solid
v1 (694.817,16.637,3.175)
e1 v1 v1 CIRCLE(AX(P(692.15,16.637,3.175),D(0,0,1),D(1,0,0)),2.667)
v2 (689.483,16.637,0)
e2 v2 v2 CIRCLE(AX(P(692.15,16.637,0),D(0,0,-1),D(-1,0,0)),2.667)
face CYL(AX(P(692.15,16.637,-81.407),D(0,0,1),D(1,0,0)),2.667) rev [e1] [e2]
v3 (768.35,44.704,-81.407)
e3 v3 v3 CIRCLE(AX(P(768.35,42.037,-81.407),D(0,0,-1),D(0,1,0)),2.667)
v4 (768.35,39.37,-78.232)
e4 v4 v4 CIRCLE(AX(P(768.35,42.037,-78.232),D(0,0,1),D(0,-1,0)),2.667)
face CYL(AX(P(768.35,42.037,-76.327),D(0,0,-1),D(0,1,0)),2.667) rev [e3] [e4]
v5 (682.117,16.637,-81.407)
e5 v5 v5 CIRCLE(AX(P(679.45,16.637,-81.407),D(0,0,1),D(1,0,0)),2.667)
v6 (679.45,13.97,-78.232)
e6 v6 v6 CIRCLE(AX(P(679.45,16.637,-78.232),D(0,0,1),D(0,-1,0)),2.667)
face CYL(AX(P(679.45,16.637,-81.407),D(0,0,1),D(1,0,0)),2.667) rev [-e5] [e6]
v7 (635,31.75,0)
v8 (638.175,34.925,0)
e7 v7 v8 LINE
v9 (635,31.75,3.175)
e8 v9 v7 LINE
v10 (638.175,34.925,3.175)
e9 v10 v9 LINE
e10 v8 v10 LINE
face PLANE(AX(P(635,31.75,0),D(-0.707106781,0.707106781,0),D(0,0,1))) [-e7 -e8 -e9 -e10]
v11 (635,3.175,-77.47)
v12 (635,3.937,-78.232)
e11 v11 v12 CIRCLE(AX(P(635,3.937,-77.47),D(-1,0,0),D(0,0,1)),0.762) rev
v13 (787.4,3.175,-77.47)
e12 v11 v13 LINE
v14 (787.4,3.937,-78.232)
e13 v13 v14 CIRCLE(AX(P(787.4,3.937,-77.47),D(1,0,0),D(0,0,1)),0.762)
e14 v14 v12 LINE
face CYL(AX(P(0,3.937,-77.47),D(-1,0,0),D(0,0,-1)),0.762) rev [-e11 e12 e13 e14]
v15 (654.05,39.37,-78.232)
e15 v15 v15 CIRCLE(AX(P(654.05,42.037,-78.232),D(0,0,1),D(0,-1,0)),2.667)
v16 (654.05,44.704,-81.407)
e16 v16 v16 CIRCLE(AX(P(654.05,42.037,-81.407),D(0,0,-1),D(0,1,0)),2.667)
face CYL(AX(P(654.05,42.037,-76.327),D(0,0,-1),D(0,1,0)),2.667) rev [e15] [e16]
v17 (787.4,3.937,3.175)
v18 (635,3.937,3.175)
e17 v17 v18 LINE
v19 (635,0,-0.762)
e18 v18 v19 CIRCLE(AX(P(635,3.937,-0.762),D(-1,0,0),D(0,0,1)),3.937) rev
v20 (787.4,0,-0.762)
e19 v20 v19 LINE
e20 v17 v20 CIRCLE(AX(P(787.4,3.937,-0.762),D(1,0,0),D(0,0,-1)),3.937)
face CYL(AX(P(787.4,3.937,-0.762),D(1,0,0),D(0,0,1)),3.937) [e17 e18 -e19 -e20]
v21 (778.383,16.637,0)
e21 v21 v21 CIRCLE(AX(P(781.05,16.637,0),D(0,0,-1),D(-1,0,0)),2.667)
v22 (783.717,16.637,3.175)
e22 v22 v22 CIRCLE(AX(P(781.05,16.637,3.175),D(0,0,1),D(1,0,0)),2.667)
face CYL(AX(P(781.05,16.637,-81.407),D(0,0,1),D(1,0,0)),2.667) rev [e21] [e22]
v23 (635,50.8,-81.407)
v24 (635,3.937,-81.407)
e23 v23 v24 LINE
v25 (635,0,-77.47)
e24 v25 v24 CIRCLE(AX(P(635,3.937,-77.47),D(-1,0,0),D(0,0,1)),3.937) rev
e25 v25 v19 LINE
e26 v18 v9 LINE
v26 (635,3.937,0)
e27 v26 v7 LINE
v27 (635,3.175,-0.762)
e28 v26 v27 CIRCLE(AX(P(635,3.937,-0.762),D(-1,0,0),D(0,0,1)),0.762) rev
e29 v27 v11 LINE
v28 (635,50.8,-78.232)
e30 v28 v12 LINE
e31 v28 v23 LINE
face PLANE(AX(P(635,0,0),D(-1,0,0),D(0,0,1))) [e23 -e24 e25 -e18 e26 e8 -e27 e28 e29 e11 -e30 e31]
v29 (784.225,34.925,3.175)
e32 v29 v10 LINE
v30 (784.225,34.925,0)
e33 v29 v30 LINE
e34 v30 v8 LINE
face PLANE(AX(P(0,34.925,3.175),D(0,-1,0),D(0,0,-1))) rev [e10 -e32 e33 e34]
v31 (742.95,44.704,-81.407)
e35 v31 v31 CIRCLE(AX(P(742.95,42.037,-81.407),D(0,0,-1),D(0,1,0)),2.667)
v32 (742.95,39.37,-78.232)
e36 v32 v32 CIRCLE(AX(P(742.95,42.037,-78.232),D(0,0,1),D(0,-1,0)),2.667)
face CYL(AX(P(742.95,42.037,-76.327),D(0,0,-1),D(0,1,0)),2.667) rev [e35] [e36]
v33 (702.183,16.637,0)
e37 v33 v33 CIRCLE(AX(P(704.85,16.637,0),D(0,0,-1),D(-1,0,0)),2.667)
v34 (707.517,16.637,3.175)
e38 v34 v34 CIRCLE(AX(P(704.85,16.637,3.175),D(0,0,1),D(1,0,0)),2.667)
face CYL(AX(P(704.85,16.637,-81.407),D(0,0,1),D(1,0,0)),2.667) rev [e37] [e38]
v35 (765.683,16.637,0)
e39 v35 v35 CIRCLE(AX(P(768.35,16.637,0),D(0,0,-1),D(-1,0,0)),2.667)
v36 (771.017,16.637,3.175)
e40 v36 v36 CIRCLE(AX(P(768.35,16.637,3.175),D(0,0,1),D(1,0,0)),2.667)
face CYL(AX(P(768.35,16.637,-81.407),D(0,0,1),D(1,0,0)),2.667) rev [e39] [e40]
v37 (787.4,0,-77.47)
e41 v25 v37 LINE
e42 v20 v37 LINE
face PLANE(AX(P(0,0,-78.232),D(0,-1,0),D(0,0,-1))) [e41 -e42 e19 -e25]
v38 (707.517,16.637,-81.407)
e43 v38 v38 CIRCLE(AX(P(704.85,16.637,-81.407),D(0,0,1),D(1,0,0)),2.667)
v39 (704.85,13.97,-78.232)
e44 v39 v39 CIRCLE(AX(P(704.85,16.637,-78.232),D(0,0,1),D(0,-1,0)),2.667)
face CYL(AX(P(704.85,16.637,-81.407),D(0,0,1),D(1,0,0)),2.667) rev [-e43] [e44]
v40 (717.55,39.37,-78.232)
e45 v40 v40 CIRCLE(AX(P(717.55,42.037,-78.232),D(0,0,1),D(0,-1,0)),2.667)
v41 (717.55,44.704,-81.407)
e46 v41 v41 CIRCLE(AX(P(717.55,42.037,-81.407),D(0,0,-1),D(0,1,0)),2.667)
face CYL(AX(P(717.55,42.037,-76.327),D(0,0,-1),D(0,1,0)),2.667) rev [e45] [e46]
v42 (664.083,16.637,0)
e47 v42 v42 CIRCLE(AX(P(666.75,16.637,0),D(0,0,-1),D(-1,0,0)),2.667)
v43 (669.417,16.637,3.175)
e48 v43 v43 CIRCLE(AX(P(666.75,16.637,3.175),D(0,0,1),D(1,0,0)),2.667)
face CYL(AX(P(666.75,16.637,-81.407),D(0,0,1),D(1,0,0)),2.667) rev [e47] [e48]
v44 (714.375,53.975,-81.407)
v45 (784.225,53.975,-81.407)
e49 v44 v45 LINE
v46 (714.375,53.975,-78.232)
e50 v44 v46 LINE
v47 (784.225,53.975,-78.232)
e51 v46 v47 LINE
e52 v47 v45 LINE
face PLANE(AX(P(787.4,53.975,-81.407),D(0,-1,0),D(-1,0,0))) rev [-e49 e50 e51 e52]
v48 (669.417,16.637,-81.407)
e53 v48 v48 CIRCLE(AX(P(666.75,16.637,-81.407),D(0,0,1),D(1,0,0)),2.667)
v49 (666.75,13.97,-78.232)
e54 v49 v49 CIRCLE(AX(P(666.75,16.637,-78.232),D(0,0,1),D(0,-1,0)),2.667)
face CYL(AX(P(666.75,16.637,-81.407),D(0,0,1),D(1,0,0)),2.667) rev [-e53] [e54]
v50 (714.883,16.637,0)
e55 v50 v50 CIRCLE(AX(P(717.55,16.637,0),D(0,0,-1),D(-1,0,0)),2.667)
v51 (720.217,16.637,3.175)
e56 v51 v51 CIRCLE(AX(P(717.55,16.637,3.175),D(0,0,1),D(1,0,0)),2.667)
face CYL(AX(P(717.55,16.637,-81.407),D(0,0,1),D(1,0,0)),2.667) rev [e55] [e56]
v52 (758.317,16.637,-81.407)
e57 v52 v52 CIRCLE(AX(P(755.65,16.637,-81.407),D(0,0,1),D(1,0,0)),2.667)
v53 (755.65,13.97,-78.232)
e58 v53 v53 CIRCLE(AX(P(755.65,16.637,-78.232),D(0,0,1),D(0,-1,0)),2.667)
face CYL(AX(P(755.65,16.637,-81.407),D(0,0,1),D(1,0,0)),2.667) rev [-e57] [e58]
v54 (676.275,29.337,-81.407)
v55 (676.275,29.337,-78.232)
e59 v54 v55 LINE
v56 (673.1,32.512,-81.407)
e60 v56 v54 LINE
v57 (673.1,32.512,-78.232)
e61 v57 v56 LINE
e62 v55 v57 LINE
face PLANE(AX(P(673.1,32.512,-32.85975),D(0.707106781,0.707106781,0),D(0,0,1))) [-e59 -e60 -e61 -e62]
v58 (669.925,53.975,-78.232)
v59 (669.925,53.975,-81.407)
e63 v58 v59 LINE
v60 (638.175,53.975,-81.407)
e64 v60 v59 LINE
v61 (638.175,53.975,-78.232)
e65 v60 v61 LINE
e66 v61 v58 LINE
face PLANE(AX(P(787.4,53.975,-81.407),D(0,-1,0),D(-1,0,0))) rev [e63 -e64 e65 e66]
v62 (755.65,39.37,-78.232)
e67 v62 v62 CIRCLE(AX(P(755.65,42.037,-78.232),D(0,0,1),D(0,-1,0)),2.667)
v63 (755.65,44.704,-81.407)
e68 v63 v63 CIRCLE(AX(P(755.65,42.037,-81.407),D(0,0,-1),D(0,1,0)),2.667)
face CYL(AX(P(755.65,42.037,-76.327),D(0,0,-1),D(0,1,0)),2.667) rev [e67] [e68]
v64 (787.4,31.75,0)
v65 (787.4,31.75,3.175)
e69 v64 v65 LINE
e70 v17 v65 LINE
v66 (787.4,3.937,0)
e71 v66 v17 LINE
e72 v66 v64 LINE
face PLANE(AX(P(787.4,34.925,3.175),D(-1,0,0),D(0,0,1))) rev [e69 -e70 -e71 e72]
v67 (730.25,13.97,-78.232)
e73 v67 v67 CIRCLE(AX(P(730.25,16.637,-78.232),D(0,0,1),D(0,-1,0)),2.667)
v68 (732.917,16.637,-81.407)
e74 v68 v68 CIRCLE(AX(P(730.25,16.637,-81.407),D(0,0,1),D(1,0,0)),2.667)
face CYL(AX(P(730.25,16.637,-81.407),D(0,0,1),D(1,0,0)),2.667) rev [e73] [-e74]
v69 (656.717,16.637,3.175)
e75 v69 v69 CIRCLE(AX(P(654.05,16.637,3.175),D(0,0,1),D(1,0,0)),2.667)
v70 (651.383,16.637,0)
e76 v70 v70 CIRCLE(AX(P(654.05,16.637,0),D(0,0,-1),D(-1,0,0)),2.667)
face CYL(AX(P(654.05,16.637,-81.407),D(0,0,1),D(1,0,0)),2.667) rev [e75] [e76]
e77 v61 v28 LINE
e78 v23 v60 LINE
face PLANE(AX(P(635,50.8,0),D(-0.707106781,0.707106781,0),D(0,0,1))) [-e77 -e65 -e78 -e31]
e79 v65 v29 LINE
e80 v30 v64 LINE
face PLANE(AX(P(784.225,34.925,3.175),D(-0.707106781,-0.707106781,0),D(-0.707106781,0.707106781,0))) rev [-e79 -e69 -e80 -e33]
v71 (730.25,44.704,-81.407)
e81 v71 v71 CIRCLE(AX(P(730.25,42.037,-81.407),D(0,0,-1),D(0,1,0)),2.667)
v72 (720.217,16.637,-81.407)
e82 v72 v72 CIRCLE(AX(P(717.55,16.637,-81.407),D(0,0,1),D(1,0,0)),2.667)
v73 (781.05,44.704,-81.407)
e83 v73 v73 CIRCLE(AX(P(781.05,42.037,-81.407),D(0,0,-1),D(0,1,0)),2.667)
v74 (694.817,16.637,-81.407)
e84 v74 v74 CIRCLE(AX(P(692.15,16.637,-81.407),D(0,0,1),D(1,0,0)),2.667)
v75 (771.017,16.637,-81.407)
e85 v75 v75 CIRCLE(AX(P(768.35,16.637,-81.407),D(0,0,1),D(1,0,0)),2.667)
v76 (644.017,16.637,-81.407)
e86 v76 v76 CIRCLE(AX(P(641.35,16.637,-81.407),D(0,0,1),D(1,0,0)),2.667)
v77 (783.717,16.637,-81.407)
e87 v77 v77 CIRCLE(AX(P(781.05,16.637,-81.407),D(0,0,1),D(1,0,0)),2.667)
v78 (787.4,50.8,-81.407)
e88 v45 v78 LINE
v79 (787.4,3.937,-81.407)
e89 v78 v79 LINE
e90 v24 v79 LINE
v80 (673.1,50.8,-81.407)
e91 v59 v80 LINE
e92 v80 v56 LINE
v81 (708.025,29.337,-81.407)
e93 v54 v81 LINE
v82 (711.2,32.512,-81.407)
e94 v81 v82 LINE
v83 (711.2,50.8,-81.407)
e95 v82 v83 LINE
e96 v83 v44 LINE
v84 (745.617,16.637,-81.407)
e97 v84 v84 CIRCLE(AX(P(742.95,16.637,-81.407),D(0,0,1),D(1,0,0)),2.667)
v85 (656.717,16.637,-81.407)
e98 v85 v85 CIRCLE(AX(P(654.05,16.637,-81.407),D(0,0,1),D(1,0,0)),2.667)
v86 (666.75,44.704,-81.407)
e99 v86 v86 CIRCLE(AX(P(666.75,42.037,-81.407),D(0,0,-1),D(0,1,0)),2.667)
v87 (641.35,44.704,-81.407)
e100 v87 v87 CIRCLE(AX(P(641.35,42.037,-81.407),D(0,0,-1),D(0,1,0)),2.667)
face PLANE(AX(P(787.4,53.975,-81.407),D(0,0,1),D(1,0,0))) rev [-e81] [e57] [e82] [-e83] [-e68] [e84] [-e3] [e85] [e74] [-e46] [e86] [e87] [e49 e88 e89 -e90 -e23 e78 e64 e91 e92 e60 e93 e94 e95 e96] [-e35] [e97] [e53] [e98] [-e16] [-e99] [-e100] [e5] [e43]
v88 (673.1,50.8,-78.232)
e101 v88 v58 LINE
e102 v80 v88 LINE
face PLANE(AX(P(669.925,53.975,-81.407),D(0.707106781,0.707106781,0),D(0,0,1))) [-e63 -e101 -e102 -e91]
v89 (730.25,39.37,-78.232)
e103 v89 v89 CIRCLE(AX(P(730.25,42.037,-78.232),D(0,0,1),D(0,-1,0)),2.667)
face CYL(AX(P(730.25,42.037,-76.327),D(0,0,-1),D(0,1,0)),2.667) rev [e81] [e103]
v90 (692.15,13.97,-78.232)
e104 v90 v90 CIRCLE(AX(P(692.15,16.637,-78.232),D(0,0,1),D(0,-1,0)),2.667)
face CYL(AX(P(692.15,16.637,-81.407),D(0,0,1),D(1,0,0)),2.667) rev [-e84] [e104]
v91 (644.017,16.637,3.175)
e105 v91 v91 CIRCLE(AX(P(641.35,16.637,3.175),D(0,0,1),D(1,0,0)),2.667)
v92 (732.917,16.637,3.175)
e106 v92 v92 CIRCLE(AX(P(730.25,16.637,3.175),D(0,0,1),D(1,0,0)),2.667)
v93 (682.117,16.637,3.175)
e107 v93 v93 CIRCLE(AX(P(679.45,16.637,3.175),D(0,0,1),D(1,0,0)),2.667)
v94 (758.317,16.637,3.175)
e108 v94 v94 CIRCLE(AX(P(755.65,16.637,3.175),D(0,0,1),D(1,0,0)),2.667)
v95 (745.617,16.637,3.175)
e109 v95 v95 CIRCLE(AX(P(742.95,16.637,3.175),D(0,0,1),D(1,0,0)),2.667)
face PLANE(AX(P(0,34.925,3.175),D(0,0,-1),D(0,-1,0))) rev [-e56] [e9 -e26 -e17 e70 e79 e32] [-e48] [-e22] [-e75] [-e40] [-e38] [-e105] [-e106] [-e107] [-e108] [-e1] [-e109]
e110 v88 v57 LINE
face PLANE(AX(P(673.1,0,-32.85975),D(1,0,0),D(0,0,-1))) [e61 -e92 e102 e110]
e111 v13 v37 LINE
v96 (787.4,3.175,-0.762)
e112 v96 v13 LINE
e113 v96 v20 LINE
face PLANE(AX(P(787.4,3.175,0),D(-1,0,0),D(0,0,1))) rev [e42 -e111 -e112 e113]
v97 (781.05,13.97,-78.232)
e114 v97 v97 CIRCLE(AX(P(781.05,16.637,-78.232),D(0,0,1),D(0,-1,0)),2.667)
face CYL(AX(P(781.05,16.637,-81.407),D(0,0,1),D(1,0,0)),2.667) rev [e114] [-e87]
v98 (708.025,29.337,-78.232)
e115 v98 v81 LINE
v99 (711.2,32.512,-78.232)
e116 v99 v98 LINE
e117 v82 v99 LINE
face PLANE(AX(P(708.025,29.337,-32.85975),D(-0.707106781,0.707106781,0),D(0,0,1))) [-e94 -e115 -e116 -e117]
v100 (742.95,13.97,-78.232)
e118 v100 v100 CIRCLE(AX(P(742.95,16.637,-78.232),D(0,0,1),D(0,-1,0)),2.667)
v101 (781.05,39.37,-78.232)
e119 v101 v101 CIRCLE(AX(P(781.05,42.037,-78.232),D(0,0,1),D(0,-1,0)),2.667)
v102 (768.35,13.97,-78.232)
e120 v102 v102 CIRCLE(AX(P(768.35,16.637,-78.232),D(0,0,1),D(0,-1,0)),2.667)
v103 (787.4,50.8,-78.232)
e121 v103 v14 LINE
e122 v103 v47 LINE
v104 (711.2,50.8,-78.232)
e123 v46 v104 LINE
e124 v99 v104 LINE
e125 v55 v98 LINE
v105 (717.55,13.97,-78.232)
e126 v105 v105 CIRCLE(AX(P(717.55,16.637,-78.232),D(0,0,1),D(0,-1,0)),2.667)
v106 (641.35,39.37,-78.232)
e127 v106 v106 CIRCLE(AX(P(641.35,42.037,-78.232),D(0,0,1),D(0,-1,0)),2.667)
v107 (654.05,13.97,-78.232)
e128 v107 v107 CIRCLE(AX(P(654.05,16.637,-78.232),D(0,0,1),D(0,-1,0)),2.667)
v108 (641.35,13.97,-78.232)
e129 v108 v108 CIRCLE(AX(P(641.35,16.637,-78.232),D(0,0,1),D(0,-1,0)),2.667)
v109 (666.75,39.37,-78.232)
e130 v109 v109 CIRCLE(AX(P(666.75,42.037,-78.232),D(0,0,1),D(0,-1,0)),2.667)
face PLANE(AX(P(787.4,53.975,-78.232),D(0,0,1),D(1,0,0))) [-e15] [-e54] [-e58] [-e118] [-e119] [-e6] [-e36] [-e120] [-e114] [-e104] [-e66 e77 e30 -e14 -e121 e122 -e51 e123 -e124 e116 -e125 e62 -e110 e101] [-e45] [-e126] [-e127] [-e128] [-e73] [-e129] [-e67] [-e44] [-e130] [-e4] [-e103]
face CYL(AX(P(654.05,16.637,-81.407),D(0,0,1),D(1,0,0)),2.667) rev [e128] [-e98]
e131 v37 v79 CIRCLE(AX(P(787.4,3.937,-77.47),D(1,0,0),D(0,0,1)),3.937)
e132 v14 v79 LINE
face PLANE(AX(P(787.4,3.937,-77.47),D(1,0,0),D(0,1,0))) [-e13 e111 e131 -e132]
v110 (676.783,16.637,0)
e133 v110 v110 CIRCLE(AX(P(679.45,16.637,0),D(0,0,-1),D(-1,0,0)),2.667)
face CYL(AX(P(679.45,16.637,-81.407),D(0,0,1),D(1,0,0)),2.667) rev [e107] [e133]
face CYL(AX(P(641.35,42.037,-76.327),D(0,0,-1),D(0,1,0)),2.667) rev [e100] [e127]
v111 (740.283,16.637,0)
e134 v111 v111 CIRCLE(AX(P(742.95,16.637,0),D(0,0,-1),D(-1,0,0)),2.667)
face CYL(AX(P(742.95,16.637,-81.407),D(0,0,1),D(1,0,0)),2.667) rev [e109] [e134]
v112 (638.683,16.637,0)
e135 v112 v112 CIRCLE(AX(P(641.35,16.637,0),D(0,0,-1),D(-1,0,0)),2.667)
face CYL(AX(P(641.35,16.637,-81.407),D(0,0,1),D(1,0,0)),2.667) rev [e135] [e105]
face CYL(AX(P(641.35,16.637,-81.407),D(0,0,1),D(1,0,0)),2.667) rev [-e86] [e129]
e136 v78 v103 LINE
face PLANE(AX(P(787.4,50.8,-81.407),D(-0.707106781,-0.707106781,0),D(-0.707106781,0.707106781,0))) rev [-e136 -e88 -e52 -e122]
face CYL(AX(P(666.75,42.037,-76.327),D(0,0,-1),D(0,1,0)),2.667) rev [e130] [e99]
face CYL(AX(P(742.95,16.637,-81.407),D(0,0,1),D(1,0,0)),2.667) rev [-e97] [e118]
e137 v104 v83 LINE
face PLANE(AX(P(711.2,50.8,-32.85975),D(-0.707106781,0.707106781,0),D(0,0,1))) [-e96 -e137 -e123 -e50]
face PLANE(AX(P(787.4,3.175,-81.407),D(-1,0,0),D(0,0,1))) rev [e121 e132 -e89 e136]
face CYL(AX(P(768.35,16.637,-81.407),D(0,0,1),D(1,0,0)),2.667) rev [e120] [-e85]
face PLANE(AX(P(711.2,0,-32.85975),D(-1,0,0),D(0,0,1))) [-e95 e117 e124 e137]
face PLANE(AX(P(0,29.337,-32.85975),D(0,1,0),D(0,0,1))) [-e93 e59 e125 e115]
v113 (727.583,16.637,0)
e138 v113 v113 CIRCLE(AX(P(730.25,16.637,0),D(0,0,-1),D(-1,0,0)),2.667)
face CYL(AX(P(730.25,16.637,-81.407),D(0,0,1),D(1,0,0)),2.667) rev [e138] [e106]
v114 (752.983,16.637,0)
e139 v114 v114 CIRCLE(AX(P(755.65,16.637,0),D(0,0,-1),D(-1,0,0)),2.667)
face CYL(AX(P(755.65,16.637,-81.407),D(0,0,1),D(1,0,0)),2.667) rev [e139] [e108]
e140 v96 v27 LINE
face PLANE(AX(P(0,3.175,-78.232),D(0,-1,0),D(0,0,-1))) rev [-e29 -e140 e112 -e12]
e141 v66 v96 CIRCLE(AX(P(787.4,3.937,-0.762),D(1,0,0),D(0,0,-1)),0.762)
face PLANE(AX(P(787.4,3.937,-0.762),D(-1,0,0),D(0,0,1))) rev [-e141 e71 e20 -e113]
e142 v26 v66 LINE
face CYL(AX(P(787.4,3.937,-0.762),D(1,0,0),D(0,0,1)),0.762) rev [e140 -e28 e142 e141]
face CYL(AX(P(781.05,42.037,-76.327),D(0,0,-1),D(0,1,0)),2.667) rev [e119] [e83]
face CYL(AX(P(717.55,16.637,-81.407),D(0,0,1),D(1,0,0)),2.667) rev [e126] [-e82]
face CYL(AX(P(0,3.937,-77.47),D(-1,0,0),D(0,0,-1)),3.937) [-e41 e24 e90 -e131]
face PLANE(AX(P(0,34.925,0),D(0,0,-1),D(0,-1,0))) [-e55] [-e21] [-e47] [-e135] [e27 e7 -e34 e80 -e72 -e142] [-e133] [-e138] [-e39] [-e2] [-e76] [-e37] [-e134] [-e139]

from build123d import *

# Parameters (mm, degrees)
CUT_EXTRUDE1_START       = -81.407
CUT_EXTRUDE1_OUTLINE_W   = 152.4
CUT_EXTRUDE1_OUTLINE_H   = 3.175
CUT_EXTRUDE1_DEPTH       = 84.582
CUT_EXTRUDE1_2_OUTLINE_R = 2.667
CUT_EXTRUDE1_2_DEPTH     = 3.175
CUT_EXTRUDE1_START_2     = -0.762
CUT_EXTRUDE1_3_OUTLINE_R = 2.667
CUT_EXTRUDE1_3_DEPTH     = 3.937
CUT_EXTRUDE1_START_3     = -78.232
CUT_EXTRUDE1_4_OUTLINE_R = 2.667
CUT_EXTRUDE1_4_DEPTH     = 0.762
CUT_EXTRUDE1_START_4     = 635
CUT_EXTRUDE1_5_DEPTH     = 152.4
CHAMFER1_SIZE            = 3.175
SKETCH2_W                = 38.1
SKETCH2_H                = 24.638
SKETCH2_R                = 2.667
CUT_EXTRUDE2_DEPTH       = 3.175
CHAMFER2_SIZE            = 3.175
CHAMFER3_SIZE            = 3.175


with BuildPart() as part:
    # Cut-Extrude1: read off the stored shape, not the designer's step
    # Cut-Extrude1 outline → Cut-Extrude1 (new body)
    with BuildSketch(Plane.XY.offset(CUT_EXTRUDE1_START)):
        with Locations((711.2, 1.5875)):
            Rectangle(CUT_EXTRUDE1_OUTLINE_W, CUT_EXTRUDE1_OUTLINE_H)
    extrude(amount=CUT_EXTRUDE1_DEPTH)

    # Cut-Extrude1 2 outline → Cut-Extrude1 2 (add)
    with BuildSketch(Plane.XY.offset(CUT_EXTRUDE1_START)):
        Polygon((635, 3.175), (787.4, 3.175), (787.4, 50.8), (784.225, 53.975), (635, 53.975), align=None)
        with Locations((641.35, 16.637)):
            Circle(CUT_EXTRUDE1_2_OUTLINE_R, mode=Mode.SUBTRACT)
        with Locations((654.05, 16.637)):
            Circle(CUT_EXTRUDE1_2_OUTLINE_R, mode=Mode.SUBTRACT)
        with Locations((666.75, 16.637)):
            Circle(CUT_EXTRUDE1_2_OUTLINE_R, mode=Mode.SUBTRACT)
        with Locations((679.45, 16.637)):
            Circle(CUT_EXTRUDE1_2_OUTLINE_R, mode=Mode.SUBTRACT)
        with Locations((692.15, 16.637)):
            Circle(CUT_EXTRUDE1_2_OUTLINE_R, mode=Mode.SUBTRACT)
        with Locations((704.85, 16.637)):
            Circle(CUT_EXTRUDE1_2_OUTLINE_R, mode=Mode.SUBTRACT)
        with Locations((717.55, 16.637)):
            Circle(CUT_EXTRUDE1_2_OUTLINE_R, mode=Mode.SUBTRACT)
        with Locations((730.25, 16.637)):
            Circle(CUT_EXTRUDE1_2_OUTLINE_R, mode=Mode.SUBTRACT)
        with Locations((742.95, 16.637)):
            Circle(CUT_EXTRUDE1_2_OUTLINE_R, mode=Mode.SUBTRACT)
        with Locations((755.65, 16.637)):
            Circle(CUT_EXTRUDE1_2_OUTLINE_R, mode=Mode.SUBTRACT)
        with Locations((768.35, 16.637)):
            Circle(CUT_EXTRUDE1_2_OUTLINE_R, mode=Mode.SUBTRACT)
        with Locations((781.05, 16.637)):
            Circle(CUT_EXTRUDE1_2_OUTLINE_R, mode=Mode.SUBTRACT)
        with Locations((768.35, 42.037)):
            Circle(CUT_EXTRUDE1_2_OUTLINE_R, mode=Mode.SUBTRACT)
        with Locations((781.05, 42.037)):
            Circle(CUT_EXTRUDE1_2_OUTLINE_R, mode=Mode.SUBTRACT)
        with Locations((641.35, 42.037)):
            Circle(CUT_EXTRUDE1_2_OUTLINE_R, mode=Mode.SUBTRACT)
        with Locations((654.05, 42.037)):
            Circle(CUT_EXTRUDE1_2_OUTLINE_R, mode=Mode.SUBTRACT)
        with Locations((666.75, 42.037)):
            Circle(CUT_EXTRUDE1_2_OUTLINE_R, mode=Mode.SUBTRACT)
        with Locations((679.45, 42.037)):
            Circle(CUT_EXTRUDE1_2_OUTLINE_R, mode=Mode.SUBTRACT)
        with Locations((692.15, 42.037)):
            Circle(CUT_EXTRUDE1_2_OUTLINE_R, mode=Mode.SUBTRACT)
        with Locations((704.85, 42.037)):
            Circle(CUT_EXTRUDE1_2_OUTLINE_R, mode=Mode.SUBTRACT)
        with Locations((717.55, 42.037)):
            Circle(CUT_EXTRUDE1_2_OUTLINE_R, mode=Mode.SUBTRACT)
        with Locations((730.25, 42.037)):
            Circle(CUT_EXTRUDE1_2_OUTLINE_R, mode=Mode.SUBTRACT)
        with Locations((742.95, 42.037)):
            Circle(CUT_EXTRUDE1_2_OUTLINE_R, mode=Mode.SUBTRACT)
        with Locations((755.65, 42.037)):
            Circle(CUT_EXTRUDE1_2_OUTLINE_R, mode=Mode.SUBTRACT)
    extrude(amount=CUT_EXTRUDE1_2_DEPTH)

    # Cut-Extrude1 3 outline → Cut-Extrude1 3 (add)
    with BuildSketch(Plane.XY.offset(CUT_EXTRUDE1_START_2)):
        Polygon((635, 34.925), (635, 3.175), (787.4, 3.175), (787.4, 31.75), (784.225, 34.925), align=None)
        with Locations((641.35, 16.637)):
            Circle(CUT_EXTRUDE1_3_OUTLINE_R, mode=Mode.SUBTRACT)
        with Locations((654.05, 16.637)):
            Circle(CUT_EXTRUDE1_3_OUTLINE_R, mode=Mode.SUBTRACT)
        with Locations((666.75, 16.637)):
            Circle(CUT_EXTRUDE1_3_OUTLINE_R, mode=Mode.SUBTRACT)
        with Locations((679.45, 16.637)):
            Circle(CUT_EXTRUDE1_3_OUTLINE_R, mode=Mode.SUBTRACT)
        with Locations((692.15, 16.637)):
            Circle(CUT_EXTRUDE1_3_OUTLINE_R, mode=Mode.SUBTRACT)
        with Locations((704.85, 16.637)):
            Circle(CUT_EXTRUDE1_3_OUTLINE_R, mode=Mode.SUBTRACT)
        with Locations((717.55, 16.637)):
            Circle(CUT_EXTRUDE1_3_OUTLINE_R, mode=Mode.SUBTRACT)
        with Locations((730.25, 16.637)):
            Circle(CUT_EXTRUDE1_3_OUTLINE_R, mode=Mode.SUBTRACT)
        with Locations((742.95, 16.637)):
            Circle(CUT_EXTRUDE1_3_OUTLINE_R, mode=Mode.SUBTRACT)
        with Locations((755.65, 16.637)):
            Circle(CUT_EXTRUDE1_3_OUTLINE_R, mode=Mode.SUBTRACT)
        with Locations((768.35, 16.637)):
            Circle(CUT_EXTRUDE1_3_OUTLINE_R, mode=Mode.SUBTRACT)
        with Locations((781.05, 16.637)):
            Circle(CUT_EXTRUDE1_3_OUTLINE_R, mode=Mode.SUBTRACT)
    extrude(amount=CUT_EXTRUDE1_3_DEPTH)

    # Cut-Extrude1 4 outline → Cut-Extrude1 4 (add)
    with BuildSketch(Plane.XY.offset(CUT_EXTRUDE1_START_3)):
        Polygon((635, 34.925), (635, 3.175), (787.4, 3.175), (787.4, 31.75), (784.225, 34.925), align=None)
        with Locations((641.35, 16.637)):
            Circle(CUT_EXTRUDE1_4_OUTLINE_R, mode=Mode.SUBTRACT)
        with Locations((654.05, 16.637)):
            Circle(CUT_EXTRUDE1_4_OUTLINE_R, mode=Mode.SUBTRACT)
        with Locations((666.75, 16.637)):
            Circle(CUT_EXTRUDE1_4_OUTLINE_R, mode=Mode.SUBTRACT)
        with Locations((679.45, 16.637)):
            Circle(CUT_EXTRUDE1_4_OUTLINE_R, mode=Mode.SUBTRACT)
        with Locations((692.15, 16.637)):
            Circle(CUT_EXTRUDE1_4_OUTLINE_R, mode=Mode.SUBTRACT)
        with Locations((704.85, 16.637)):
            Circle(CUT_EXTRUDE1_4_OUTLINE_R, mode=Mode.SUBTRACT)
        with Locations((717.55, 16.637)):
            Circle(CUT_EXTRUDE1_4_OUTLINE_R, mode=Mode.SUBTRACT)
        with Locations((730.25, 16.637)):
            Circle(CUT_EXTRUDE1_4_OUTLINE_R, mode=Mode.SUBTRACT)
        with Locations((742.95, 16.637)):
            Circle(CUT_EXTRUDE1_4_OUTLINE_R, mode=Mode.SUBTRACT)
        with Locations((755.65, 16.637)):
            Circle(CUT_EXTRUDE1_4_OUTLINE_R, mode=Mode.SUBTRACT)
        with Locations((768.35, 16.637)):
            Circle(CUT_EXTRUDE1_4_OUTLINE_R, mode=Mode.SUBTRACT)
        with Locations((781.05, 16.637)):
            Circle(CUT_EXTRUDE1_4_OUTLINE_R, mode=Mode.SUBTRACT)
    extrude(amount=CUT_EXTRUDE1_4_DEPTH)

    # Cut-Extrude1 5 outline → Cut-Extrude1 5 (cut)
    with BuildSketch(Plane.YZ.offset(CUT_EXTRUDE1_START_4)):
        with BuildLine():
            Line((0, -81.407), (3.937, -81.407))
            ThreePointArc((3.937, -81.407), (1.153120602, -80.253879398), (0, -77.47))
            Line((0, -77.47), (0, -81.407))
        make_face()
        with BuildLine():
            Line((34.925, -0.762), (34.925, 0))
            Line((34.925, 0), (3.937, 0))
            ThreePointArc((3.937, 0), (3.398184633, -0.223184633), (3.175, -0.762))
            Line((3.175, -0.762), (34.925, -0.762))
        make_face()
        with BuildLine():
            Line((0, 3.175), (0, -0.762))
            ThreePointArc((0, -0.762), (1.153120602, 2.021879398), (3.937, 3.175))
            Line((3.937, 3.175), (0, 3.175))
        make_face()
        with BuildLine():
            ThreePointArc((3.175, -77.47), (3.398184633, -78.008815367), (3.937, -78.232))
            Line((3.937, -78.232), (34.925, -78.232))
            Line((34.925, -78.232), (34.925, -77.47))
            Line((34.925, -77.47), (3.175, -77.47))
        make_face()
    extrude(amount=CUT_EXTRUDE1_5_DEPTH, mode=Mode.SUBTRACT)

    # Chamfer1
    chamfer1_edges = [part.edges().sort_by_distance(p)[0] for p in [
        (635, 34.925, 1.5875),
        (635, 53.975, -79.8195),
    ]]
    chamfer(chamfer1_edges, length=CHAMFER1_SIZE)

    # Sketch2 → Cut-Extrude2 (cut)
    with BuildSketch(Plane(origin=(0, 0, -81.407), x_dir=(-1, 0, 0), z_dir=(0, 0, -1))):
        with Locations((-692.15, 41.656)):
            Rectangle(SKETCH2_W, SKETCH2_H)
        with Locations((-704.85, 42.037)):
            Circle(SKETCH2_R, mode=Mode.SUBTRACT)
        with Locations((-692.15, 42.037)):
            Circle(SKETCH2_R, mode=Mode.SUBTRACT)
        with Locations((-679.45, 42.037)):
            Circle(SKETCH2_R, mode=Mode.SUBTRACT)
    extrude(amount=-CUT_EXTRUDE2_DEPTH, mode=Mode.SUBTRACT)

    # Chamfer2
    chamfer2_edges = [part.edges().sort_by_distance(p)[0] for p in [
        (711.2, 53.975, -79.8195),
        (673.1, 53.975, -79.8195),
    ]]
    chamfer(chamfer2_edges, length=CHAMFER2_SIZE)

    # Chamfer3
    chamfer3_edges = [part.edges().sort_by_distance(p)[0] for p in [
        (711.2, 29.337, -79.8195),
        (673.1, 29.337, -79.8195),
    ]]
    chamfer(chamfer3_edges, length=CHAMFER3_SIZE)


solid = part.part
